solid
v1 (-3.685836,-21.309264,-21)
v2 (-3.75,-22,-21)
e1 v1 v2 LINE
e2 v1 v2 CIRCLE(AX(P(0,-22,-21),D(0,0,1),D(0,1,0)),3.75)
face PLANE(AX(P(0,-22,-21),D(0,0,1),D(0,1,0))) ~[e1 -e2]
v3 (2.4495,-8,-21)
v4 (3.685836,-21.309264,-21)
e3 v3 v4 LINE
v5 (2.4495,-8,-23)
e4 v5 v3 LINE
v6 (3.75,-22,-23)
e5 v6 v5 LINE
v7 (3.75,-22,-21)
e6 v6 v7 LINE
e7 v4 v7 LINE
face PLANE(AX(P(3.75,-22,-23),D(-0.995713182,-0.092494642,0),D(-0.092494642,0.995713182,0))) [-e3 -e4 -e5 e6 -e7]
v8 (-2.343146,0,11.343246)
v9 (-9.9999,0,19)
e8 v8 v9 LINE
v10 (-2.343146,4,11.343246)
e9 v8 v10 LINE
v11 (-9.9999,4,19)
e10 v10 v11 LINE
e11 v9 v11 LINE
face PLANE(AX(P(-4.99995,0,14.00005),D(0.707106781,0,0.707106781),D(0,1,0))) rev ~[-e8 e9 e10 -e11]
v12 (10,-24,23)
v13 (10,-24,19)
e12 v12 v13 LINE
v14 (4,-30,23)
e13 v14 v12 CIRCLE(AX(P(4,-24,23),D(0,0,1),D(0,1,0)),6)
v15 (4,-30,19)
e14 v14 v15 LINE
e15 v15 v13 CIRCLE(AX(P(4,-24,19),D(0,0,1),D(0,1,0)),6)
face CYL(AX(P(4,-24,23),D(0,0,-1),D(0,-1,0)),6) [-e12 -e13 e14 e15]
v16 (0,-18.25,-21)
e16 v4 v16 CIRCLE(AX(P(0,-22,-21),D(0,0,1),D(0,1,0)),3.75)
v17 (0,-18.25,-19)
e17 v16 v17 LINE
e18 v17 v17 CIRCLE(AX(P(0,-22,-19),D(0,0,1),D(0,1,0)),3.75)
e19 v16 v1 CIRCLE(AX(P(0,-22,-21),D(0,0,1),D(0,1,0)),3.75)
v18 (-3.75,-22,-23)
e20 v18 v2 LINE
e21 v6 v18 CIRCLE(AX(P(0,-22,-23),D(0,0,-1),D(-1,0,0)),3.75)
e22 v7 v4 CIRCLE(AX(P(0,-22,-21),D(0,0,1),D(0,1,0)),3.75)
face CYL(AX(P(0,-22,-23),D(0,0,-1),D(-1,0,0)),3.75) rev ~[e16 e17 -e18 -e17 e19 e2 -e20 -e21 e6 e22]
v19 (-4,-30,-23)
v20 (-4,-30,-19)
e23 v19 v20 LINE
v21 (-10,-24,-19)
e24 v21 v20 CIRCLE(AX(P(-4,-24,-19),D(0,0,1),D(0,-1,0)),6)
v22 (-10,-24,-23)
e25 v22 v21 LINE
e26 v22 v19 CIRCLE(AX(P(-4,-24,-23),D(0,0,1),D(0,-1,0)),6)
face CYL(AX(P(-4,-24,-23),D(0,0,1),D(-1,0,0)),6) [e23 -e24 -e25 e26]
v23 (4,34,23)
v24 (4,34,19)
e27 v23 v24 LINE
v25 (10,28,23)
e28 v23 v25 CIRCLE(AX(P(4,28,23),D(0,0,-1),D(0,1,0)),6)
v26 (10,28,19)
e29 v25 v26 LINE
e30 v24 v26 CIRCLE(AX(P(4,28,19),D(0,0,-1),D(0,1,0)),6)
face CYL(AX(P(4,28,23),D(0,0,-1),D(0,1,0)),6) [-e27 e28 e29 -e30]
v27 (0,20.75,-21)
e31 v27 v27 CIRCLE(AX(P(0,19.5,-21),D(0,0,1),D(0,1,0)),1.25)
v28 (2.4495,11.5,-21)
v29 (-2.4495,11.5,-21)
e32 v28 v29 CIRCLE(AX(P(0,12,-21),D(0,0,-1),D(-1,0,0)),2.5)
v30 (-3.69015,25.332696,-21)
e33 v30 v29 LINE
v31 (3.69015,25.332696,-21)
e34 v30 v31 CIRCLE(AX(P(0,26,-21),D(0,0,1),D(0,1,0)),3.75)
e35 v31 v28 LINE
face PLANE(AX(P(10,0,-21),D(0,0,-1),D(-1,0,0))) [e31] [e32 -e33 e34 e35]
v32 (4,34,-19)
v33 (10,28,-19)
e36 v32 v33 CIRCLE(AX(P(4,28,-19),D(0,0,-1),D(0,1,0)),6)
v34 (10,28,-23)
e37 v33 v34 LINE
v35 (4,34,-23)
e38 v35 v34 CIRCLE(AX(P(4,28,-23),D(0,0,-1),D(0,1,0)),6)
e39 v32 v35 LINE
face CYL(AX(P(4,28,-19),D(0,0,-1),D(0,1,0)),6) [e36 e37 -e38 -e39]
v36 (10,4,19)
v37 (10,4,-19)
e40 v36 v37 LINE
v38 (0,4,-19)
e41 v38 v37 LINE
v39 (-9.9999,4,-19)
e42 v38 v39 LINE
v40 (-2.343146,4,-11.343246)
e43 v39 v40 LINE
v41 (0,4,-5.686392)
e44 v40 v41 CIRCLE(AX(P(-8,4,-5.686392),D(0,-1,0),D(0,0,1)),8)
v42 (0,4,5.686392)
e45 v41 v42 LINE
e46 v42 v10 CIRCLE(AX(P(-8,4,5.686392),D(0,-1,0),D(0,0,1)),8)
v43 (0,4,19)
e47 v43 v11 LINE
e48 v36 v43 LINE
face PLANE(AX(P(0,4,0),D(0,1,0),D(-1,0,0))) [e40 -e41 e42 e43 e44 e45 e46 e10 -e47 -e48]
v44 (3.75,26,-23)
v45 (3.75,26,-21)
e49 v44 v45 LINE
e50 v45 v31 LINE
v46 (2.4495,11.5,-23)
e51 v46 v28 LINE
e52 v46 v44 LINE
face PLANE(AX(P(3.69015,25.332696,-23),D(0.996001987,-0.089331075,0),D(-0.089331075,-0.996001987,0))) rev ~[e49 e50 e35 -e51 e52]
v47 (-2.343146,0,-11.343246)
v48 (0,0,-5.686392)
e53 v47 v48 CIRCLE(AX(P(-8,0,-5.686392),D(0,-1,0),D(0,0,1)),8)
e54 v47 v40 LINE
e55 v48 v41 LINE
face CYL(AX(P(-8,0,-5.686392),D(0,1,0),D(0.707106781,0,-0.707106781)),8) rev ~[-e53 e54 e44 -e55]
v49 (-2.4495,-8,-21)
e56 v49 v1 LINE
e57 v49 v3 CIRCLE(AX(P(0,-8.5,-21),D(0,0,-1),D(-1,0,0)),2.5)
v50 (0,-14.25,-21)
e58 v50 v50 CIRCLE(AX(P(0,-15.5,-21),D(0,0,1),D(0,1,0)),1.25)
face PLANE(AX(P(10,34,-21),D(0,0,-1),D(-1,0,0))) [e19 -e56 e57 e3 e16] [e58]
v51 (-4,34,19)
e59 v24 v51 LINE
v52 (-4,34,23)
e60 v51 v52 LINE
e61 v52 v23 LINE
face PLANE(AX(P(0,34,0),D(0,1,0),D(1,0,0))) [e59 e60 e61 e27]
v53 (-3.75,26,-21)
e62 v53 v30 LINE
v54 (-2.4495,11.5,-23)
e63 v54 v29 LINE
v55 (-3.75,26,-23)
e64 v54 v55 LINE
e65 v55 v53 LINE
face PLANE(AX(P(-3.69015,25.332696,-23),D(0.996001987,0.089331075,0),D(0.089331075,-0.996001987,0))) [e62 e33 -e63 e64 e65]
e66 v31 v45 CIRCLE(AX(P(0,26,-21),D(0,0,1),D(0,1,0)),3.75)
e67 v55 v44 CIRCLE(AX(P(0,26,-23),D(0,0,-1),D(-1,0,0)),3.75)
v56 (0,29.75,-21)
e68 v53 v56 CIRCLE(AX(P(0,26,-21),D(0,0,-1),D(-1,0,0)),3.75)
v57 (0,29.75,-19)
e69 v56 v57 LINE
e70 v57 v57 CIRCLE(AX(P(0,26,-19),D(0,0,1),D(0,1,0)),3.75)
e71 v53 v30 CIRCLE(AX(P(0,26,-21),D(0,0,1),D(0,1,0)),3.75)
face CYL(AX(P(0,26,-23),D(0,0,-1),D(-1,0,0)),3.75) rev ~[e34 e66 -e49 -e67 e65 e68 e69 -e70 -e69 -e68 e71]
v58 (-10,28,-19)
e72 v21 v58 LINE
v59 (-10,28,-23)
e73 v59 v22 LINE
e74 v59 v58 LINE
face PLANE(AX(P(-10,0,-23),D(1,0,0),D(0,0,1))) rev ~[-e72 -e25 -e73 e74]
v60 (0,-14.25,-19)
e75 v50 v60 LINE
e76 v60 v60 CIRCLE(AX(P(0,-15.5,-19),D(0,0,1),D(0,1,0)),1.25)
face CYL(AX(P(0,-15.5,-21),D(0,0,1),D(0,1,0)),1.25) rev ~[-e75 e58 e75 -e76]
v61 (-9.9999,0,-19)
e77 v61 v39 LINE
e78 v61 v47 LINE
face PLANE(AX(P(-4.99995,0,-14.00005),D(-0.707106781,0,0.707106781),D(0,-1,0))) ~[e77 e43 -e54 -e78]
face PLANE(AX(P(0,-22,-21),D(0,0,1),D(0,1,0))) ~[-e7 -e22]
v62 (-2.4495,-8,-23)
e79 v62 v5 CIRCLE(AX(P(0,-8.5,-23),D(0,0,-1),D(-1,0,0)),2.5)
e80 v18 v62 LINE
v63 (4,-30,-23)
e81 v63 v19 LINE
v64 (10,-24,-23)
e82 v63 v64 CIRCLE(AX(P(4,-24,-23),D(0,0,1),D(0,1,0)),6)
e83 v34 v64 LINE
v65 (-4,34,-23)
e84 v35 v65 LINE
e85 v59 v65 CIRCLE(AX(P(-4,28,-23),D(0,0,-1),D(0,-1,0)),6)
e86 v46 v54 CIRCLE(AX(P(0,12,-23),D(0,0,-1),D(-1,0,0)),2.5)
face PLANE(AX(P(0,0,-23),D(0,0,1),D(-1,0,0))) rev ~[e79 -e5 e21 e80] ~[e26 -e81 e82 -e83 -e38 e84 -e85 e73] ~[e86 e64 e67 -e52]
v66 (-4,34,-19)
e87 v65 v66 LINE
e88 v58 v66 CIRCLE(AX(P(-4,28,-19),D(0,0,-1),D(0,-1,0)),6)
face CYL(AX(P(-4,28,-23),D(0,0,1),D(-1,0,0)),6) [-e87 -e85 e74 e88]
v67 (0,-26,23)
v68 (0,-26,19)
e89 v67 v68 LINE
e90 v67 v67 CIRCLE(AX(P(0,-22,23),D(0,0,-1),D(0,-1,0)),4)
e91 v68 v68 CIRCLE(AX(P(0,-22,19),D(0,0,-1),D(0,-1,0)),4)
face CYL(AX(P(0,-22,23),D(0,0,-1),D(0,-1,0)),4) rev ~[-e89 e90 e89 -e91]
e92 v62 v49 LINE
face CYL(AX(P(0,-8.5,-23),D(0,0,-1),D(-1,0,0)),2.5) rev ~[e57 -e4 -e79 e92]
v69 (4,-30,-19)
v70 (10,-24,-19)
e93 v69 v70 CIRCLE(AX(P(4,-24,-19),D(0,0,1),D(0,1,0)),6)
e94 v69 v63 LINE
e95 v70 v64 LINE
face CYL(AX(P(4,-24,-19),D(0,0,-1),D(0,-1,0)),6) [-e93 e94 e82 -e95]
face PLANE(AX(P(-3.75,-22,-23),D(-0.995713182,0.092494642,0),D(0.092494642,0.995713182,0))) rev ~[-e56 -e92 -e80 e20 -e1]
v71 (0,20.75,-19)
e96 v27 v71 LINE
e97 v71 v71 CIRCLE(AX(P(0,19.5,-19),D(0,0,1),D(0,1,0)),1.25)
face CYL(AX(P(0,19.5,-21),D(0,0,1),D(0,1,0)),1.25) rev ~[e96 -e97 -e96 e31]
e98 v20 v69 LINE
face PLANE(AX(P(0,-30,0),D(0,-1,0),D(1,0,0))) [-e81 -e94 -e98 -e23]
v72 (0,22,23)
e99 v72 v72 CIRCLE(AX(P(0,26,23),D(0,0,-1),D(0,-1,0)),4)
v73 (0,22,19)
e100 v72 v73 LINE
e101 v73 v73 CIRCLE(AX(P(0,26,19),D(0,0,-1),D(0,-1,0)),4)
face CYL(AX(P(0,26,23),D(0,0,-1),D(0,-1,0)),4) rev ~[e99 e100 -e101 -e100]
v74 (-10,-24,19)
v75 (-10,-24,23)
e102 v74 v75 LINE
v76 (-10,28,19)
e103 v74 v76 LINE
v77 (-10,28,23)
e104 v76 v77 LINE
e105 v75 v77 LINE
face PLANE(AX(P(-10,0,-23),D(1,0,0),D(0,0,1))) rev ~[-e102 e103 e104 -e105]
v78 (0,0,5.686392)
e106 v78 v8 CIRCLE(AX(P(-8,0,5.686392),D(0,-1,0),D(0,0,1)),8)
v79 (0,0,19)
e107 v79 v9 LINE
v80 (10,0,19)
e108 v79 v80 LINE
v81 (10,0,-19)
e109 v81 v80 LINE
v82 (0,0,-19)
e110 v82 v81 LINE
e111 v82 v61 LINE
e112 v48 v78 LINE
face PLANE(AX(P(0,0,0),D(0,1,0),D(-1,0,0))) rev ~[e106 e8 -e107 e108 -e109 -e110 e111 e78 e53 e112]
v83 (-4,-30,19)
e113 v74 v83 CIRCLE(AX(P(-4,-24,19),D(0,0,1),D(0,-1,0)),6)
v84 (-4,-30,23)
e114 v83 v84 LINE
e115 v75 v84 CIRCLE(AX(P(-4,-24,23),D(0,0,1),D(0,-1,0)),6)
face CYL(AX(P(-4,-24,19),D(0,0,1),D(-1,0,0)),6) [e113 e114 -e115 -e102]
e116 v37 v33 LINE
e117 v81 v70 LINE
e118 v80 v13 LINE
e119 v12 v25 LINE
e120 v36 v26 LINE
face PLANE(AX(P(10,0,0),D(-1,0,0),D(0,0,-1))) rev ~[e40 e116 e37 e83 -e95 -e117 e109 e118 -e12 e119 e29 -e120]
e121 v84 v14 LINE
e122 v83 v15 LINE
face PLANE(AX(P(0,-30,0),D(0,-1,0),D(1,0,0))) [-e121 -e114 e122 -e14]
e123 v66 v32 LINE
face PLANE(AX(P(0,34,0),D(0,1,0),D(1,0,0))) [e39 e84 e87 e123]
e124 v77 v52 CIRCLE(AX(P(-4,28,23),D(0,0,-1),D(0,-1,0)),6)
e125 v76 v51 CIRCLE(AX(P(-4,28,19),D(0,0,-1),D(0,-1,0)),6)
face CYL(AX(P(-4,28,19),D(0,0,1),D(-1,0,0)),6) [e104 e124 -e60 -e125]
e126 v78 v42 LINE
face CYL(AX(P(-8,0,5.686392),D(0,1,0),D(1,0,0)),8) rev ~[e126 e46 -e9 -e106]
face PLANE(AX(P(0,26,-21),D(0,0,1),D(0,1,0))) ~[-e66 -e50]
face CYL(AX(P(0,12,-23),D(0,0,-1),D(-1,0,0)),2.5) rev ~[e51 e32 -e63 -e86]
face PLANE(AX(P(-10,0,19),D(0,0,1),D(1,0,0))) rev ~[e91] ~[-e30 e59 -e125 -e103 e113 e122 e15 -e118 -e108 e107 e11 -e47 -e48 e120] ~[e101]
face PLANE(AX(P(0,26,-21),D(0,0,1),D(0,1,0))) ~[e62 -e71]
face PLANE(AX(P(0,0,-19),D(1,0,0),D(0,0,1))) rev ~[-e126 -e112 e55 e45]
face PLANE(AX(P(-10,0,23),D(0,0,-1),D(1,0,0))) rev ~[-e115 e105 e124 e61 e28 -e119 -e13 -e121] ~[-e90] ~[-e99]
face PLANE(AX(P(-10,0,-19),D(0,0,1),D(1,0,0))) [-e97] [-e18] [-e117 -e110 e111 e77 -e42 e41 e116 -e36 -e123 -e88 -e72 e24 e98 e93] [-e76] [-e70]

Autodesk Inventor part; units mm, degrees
ref_plane "YZ Plane" through (0, 0, 0) normal (1, 0, 0) x (0, 1, 0)
ref_plane "XZ Plane" through (0, 0, 0) normal (0, 1, 0) x (-1, 0, 0)
ref_plane "XY Plane" through (0, 0, 0) normal (0, 0, 1) x (1, 0, 0)
sketch "Sketch1" plane through (0, 0, 0) normal (0, 1, 0) x (-1, 0, 0)
  line L0 (14, 0) -> (-14, 0) projected
  line L1 (0, -32.2) -> (0, 32.2) projected
  line L2 (10, 23) -> (-10, 23)
  line L3 (-10, 23) -> (-10, -23)
  line L4 (-10, -23) -> (10, -23)
  line L5 (10, -23) -> (10, 23)
  point P0 (0, 0)
  dimension "d0" = 46
  dimension "d1" = 20
extrude "Extrusion1" add sketch "Sketch1" along normal blind 4
sketch "Sketch2" plane through (0, 4, 0) normal (0, 1, 0) x (1, 0, 0)
  line L0 (-10, -23) -> (10, -23) projected
  line L1 (10, -23) -> (10, 23) projected
  line L2 (10, 23) -> (-10, 23) projected
  line L3 (-10, 23) -> (-10, -23) projected
  line L4 (-10, -23) -> (10, -23)
  line L5 (10, -23) -> (10, -19)
  line L6 (10, -19) -> (-10, -19)
  line L7 (-10, -19) -> (-10, -23)
  line L8 (-10, 19) -> (10, 19)
  line L9 (10, 19) -> (10, 23)
  line L10 (10, 23) -> (-10, 23)
  line L11 (-10, 23) -> (-10, 19)
  line L12 (-10, -23) -> (10, -23) projected
  line L13 (-10, 23) -> (-10, -23) projected
  line L14 (10, -23) -> (10, 23) projected
  line L15 (10, 23) -> (-10, 23) projected
  point P0 (0, 0)
  dimension "d4" = 4
  dimension "d5" = 4
extrude "Extrusion2" add sketch "Sketch2" along normal blind 30 contours L3 L6 L1 L0 | L3 L2 L1 L8
sketch "Sketch4" plane through (-10, 0, 23) normal (0, 0, 1) x (1, 0, 0)
  line L0 (0, 0) -> (20, 0) projected
  line L1 (20, 0) -> (20, 34) projected
  line L2 (0, 34) -> (20, 34) projected
  line L3 (0, 0) -> (0, 34) projected
  point P0 (10, 0)
  point P1 (10, 26)
  dimension "d8" = 10
  dimension "d9" = 8
hole "Hole1" at (0, 26, 23) direction (0, 0, -1) diameter 8 depth 42
sketch "Sketch10" plane through (10, 0, -23) normal (0, 0, -1) x (-1, 0, 0)
  line L0 (0, 34) -> (20, 34) projected
  line L1 (0, 0) -> (0, 34) projected
  line L2 (0, 0) -> (20, 0) projected
  line L3 (20, 0) -> (20, 34) projected
  circle A0 centre (10, 26) radius 4 projected
  circle A1 centre (10, 26) radius 3.75
  circle A2 centre (10, 12) radius 2.5
  line L4 (-6.7241, 9.5) -> (37.2046, 9.5) construction
  line L5 (6.25, 26) -> (7.5505, 11.5)
  line L6 (13.75, 26) -> (12.4495, 11.5)
  point P0 (10, 0)
  dimension "d47" = 16.5
  dimension "d48" = 7.5
  dimension "d49" = 5
  dimension "d50" = 10
  dimension "d51" = 2
  dimension "d52" = 2
  dimension "d53" = 8
  dimension "d54" = 8
extrude "Extrusion4" cut sketch "Sketch10" against normal blind 2 contours L5 A1 L6 A0 | A0 L6 A2 L5 | L5 A1 L6 | A2 L6 L5 picked at (10.4522, 22.2104)
sketch "Sketch11" plane through (10, 0, -21) normal (0, 0, -1) x (-1, 0, 0)
  line L0 (7.5505, 11.5) -> (6.25, 26) projected
  arc A0 (7.5505, 11.5) -> (12.4495, 11.5) centre (10, 12) ccw projected
  line L1 (13.75, 26) -> (12.4495, 11.5) projected
  arc A1 (13.75, 26) -> (6.25, 26) centre (10, 26) ccw projected
  point P0 (10, 0)
hole "Hole4" at (0, 26, -21) direction (0, 0, 1) diameter 7.5 depth 40
sketch "Sketch12" plane through (10, 0, -21) normal (0, 0, -1) x (-1, 0, 0)
  arc A0 (6.3099, 25.3327) -> (13.6901, 25.3327) centre (10, 26) ccw projected
  line L0 (7.5505, 11.5) -> (6.3099, 25.3327) projected
  arc A1 (7.5505, 11.5) -> (12.4495, 11.5) centre (10, 12) ccw projected
  line L1 (13.6901, 25.3327) -> (12.4495, 11.5) projected
  line L2 (0, 0) -> (0, 34) projected
  point P0 (10, 0)
  point P1 (10, 19.5)
  point P2 (0, 28)
  dimension "d64" = 6.5
  dimension "d65" = 10
hole "Hole5" at (0, 19.5, -21) direction (0, 0, 1) diameter 2.5 depth 40
sketch "Sketch13" plane through (0, 0, 0) normal (0, -1, 0) x (1, 0, 0)
  line L0 (-10, 23) -> (10, 23) projected
  line L1 (-10, -23) -> (-10, 23) projected
  line L2 (10, -23) -> (-10, -23) projected
  line L3 (10, 23) -> (10, -23) projected
  line L4 (10, 23) -> (10, -23) projected
  line L5 (-10, -19) -> (-10, 19) projected
  line L6 (10, 23) -> (-10, 23)
  line L7 (-10, 23) -> (-10, 19)
  line L8 (-10, 19) -> (10, 19)
  line L9 (10, 19) -> (10, 23)
  line L10 (10, -23) -> (-10, -23)
  line L11 (-10, -23) -> (-10, -19)
  line L12 (-10, -19) -> (10, -19)
  line L13 (10, -19) -> (10, -23)
  point P0 (0, 0)
extrude "Extrusion5" add sketch "Sketch13" along normal blind 30 contours L0 L3 L8 L1 | L12 L3 L2 L1
sketch "Sketch14" plane through (10, 34, -23) normal (0, 0, -1) x (-1, 0, 0)
  arc A0 (7.5505, -22.5) -> (12.4495, -22.5) centre (10, -22) ccw projected
  line L0 (7.5505, -22.5) -> (6.25, -8) projected
  arc A1 (13.75, -8) -> (6.25, -8) centre (10, -8) ccw projected
  line L1 (13.75, -8) -> (12.4495, -22.5) projected
  line L2 (20, -64) -> (20, 0) projected
  line L3 (0, 0) -> (20, 0) projected
  line L4 (0, -64) -> (0, 0) projected
  line L5 (20, -64) -> (0, -64) projected
  line L6 (0, -34) -> (0, -64) projected
  line L7 (0, -40) -> (20, -40) construction
  circle A2 centre (10, -56) radius 3.75
  circle A3 centre (10, -42.5) radius 2.5
  line L8 (6.25, -56) -> (7.5505, -42)
  line L9 (13.75, -56) -> (12.4495, -42)
  point P0 (10, -34)
  dimension "d77" = 8
  dimension "d78" = 10
  dimension "d79" = 7.5
  dimension "d80" = 16
  dimension "d81" = 5
  dimension "d82" = 10
  dimension "d85" = 2
  dimension "d86" = 8
  dimension "d87" = 2
  dimension "d88" = 8
extrude "Extrusion6" cut sketch "Sketch14" against normal blind 2 contours L8 A2 L9 | L8 A3 L9 A2 | L8 A3 L9
sketch "Sketch15" plane through (10, 34, -21) normal (0, 0, -1) x (-1, 0, 0)
  arc A0 (6.25, -56) -> (13.75, -56) centre (10, -56) ccw projected
  line L0 (12.4495, -42) -> (13.75, -56) projected
  arc A1 (12.4495, -42) -> (7.5505, -42) centre (10, -42.5) ccw projected
  line L1 (6.25, -56) -> (7.5505, -42) projected
  point P0 (10, -34)
hole "Hole6" at (0, -22, -21) direction (0, 0, 1) diameter 7.5 depth 40
sketch "Sketch16" plane through (10, 34, -21) normal (0, 0, -1) x (-1, 0, 0)
  arc A0 (13.6858, -55.3093) -> (6.3142, -55.3093) centre (10, -56) ccw projected
  line L0 (12.4495, -42) -> (13.6858, -55.3093) projected
  arc A1 (12.4495, -42) -> (7.5505, -42) centre (10, -42.5) ccw projected
  line L1 (6.3142, -55.3093) -> (7.5505, -42) projected
  line L2 (12.4495, -42) -> (13.75, -56) projected
  arc A2 (6.25, -56) -> (13.75, -56) centre (10, -56) ccw projected
  line L3 (6.25, -56) -> (7.5505, -42) projected
  arc A3 (12.4495, -42) -> (7.5505, -42) centre (10, -42.5) ccw projected
  arc A4 (7.5505, -22.5) -> (12.4495, -22.5) centre (10, -22) ccw projected
  line L4 (7.5505, -22.5) -> (6.25, -8) projected
  arc A5 (13.75, -8) -> (6.25, -8) centre (10, -8) ccw projected
  line L5 (13.75, -8) -> (12.4495, -22.5) projected
  line L6 (20, -64) -> (20, 0) projected
  line L7 (0, 0) -> (20, 0) projected
  line L8 (0, -64) -> (0, 0) projected
  line L9 (20, -64) -> (0, -64) projected
  point P0 (10, -34)
  point P1 (10, -49.5)
  dimension "d98" = 10
  dimension "d99" = 6.5
hole "Hole7" at (0, -15.5, -21) direction (0, 0, 1) diameter 2.5 end up to surface
sketch "Sketch17" plane through (-10, 34, 23) normal (0, 0, 1) x (1, 0, 0)
  line L0 (20, -64) -> (0, -64) projected
  line L1 (20, -64) -> (20, 0) projected
  point P0 (10, -34)
  point P1 (10, -56)
  dimension "d107" = 8
  dimension "d108" = 10
hole "Hole8" at (0, -22, 23) direction (0, 0, -1) diameter 8 depth 4
fillet "Fillet4" radius 6 8 edges at (10, -30, -21) (-10, -30, -21) (10, -30, 21) (-10, -30, 21) (10, 34, 21) (10, 34, -21) (-10, 34, -21) (-10, 34, 21)
sketch "Sketch19" plane through (0, 0, 0) normal (0, -1, 0) x (1, 0, 0)
  line L0 (10, 19) -> (-10, 19) projected
  line L1 (-10, -19) -> (-10, 19) projected
  line L2 (-10, -19) -> (10, -19) projected
  line L3 (10, 19) -> (10, -19) projected
  line L4 (-10, -19) -> (-10, 19) projected
  line L5 (10, 19) -> (-10, 19) projected
  line L6 (-10, -19) -> (0, -19)
  line L7 (0, -19) -> (0, 19)
  line L8 (0, 19) -> (-10, 19)
  line L9 (-10, 19) -> (-10, -19)
  point P0 (0, 0)
extrude "Extrusion8" cut sketch "Sketch19" against normal up to next contours L7 L2 L1 L0
chamfer "Chamfer1" distance 10 angle 45 2 edges at (0, 2, -19) (0, 2, 19)
fillet "Fillet6" radius 8 2 edges at (0, 2, 9) (0, 2, -9)
properties part number "v5_femur"
